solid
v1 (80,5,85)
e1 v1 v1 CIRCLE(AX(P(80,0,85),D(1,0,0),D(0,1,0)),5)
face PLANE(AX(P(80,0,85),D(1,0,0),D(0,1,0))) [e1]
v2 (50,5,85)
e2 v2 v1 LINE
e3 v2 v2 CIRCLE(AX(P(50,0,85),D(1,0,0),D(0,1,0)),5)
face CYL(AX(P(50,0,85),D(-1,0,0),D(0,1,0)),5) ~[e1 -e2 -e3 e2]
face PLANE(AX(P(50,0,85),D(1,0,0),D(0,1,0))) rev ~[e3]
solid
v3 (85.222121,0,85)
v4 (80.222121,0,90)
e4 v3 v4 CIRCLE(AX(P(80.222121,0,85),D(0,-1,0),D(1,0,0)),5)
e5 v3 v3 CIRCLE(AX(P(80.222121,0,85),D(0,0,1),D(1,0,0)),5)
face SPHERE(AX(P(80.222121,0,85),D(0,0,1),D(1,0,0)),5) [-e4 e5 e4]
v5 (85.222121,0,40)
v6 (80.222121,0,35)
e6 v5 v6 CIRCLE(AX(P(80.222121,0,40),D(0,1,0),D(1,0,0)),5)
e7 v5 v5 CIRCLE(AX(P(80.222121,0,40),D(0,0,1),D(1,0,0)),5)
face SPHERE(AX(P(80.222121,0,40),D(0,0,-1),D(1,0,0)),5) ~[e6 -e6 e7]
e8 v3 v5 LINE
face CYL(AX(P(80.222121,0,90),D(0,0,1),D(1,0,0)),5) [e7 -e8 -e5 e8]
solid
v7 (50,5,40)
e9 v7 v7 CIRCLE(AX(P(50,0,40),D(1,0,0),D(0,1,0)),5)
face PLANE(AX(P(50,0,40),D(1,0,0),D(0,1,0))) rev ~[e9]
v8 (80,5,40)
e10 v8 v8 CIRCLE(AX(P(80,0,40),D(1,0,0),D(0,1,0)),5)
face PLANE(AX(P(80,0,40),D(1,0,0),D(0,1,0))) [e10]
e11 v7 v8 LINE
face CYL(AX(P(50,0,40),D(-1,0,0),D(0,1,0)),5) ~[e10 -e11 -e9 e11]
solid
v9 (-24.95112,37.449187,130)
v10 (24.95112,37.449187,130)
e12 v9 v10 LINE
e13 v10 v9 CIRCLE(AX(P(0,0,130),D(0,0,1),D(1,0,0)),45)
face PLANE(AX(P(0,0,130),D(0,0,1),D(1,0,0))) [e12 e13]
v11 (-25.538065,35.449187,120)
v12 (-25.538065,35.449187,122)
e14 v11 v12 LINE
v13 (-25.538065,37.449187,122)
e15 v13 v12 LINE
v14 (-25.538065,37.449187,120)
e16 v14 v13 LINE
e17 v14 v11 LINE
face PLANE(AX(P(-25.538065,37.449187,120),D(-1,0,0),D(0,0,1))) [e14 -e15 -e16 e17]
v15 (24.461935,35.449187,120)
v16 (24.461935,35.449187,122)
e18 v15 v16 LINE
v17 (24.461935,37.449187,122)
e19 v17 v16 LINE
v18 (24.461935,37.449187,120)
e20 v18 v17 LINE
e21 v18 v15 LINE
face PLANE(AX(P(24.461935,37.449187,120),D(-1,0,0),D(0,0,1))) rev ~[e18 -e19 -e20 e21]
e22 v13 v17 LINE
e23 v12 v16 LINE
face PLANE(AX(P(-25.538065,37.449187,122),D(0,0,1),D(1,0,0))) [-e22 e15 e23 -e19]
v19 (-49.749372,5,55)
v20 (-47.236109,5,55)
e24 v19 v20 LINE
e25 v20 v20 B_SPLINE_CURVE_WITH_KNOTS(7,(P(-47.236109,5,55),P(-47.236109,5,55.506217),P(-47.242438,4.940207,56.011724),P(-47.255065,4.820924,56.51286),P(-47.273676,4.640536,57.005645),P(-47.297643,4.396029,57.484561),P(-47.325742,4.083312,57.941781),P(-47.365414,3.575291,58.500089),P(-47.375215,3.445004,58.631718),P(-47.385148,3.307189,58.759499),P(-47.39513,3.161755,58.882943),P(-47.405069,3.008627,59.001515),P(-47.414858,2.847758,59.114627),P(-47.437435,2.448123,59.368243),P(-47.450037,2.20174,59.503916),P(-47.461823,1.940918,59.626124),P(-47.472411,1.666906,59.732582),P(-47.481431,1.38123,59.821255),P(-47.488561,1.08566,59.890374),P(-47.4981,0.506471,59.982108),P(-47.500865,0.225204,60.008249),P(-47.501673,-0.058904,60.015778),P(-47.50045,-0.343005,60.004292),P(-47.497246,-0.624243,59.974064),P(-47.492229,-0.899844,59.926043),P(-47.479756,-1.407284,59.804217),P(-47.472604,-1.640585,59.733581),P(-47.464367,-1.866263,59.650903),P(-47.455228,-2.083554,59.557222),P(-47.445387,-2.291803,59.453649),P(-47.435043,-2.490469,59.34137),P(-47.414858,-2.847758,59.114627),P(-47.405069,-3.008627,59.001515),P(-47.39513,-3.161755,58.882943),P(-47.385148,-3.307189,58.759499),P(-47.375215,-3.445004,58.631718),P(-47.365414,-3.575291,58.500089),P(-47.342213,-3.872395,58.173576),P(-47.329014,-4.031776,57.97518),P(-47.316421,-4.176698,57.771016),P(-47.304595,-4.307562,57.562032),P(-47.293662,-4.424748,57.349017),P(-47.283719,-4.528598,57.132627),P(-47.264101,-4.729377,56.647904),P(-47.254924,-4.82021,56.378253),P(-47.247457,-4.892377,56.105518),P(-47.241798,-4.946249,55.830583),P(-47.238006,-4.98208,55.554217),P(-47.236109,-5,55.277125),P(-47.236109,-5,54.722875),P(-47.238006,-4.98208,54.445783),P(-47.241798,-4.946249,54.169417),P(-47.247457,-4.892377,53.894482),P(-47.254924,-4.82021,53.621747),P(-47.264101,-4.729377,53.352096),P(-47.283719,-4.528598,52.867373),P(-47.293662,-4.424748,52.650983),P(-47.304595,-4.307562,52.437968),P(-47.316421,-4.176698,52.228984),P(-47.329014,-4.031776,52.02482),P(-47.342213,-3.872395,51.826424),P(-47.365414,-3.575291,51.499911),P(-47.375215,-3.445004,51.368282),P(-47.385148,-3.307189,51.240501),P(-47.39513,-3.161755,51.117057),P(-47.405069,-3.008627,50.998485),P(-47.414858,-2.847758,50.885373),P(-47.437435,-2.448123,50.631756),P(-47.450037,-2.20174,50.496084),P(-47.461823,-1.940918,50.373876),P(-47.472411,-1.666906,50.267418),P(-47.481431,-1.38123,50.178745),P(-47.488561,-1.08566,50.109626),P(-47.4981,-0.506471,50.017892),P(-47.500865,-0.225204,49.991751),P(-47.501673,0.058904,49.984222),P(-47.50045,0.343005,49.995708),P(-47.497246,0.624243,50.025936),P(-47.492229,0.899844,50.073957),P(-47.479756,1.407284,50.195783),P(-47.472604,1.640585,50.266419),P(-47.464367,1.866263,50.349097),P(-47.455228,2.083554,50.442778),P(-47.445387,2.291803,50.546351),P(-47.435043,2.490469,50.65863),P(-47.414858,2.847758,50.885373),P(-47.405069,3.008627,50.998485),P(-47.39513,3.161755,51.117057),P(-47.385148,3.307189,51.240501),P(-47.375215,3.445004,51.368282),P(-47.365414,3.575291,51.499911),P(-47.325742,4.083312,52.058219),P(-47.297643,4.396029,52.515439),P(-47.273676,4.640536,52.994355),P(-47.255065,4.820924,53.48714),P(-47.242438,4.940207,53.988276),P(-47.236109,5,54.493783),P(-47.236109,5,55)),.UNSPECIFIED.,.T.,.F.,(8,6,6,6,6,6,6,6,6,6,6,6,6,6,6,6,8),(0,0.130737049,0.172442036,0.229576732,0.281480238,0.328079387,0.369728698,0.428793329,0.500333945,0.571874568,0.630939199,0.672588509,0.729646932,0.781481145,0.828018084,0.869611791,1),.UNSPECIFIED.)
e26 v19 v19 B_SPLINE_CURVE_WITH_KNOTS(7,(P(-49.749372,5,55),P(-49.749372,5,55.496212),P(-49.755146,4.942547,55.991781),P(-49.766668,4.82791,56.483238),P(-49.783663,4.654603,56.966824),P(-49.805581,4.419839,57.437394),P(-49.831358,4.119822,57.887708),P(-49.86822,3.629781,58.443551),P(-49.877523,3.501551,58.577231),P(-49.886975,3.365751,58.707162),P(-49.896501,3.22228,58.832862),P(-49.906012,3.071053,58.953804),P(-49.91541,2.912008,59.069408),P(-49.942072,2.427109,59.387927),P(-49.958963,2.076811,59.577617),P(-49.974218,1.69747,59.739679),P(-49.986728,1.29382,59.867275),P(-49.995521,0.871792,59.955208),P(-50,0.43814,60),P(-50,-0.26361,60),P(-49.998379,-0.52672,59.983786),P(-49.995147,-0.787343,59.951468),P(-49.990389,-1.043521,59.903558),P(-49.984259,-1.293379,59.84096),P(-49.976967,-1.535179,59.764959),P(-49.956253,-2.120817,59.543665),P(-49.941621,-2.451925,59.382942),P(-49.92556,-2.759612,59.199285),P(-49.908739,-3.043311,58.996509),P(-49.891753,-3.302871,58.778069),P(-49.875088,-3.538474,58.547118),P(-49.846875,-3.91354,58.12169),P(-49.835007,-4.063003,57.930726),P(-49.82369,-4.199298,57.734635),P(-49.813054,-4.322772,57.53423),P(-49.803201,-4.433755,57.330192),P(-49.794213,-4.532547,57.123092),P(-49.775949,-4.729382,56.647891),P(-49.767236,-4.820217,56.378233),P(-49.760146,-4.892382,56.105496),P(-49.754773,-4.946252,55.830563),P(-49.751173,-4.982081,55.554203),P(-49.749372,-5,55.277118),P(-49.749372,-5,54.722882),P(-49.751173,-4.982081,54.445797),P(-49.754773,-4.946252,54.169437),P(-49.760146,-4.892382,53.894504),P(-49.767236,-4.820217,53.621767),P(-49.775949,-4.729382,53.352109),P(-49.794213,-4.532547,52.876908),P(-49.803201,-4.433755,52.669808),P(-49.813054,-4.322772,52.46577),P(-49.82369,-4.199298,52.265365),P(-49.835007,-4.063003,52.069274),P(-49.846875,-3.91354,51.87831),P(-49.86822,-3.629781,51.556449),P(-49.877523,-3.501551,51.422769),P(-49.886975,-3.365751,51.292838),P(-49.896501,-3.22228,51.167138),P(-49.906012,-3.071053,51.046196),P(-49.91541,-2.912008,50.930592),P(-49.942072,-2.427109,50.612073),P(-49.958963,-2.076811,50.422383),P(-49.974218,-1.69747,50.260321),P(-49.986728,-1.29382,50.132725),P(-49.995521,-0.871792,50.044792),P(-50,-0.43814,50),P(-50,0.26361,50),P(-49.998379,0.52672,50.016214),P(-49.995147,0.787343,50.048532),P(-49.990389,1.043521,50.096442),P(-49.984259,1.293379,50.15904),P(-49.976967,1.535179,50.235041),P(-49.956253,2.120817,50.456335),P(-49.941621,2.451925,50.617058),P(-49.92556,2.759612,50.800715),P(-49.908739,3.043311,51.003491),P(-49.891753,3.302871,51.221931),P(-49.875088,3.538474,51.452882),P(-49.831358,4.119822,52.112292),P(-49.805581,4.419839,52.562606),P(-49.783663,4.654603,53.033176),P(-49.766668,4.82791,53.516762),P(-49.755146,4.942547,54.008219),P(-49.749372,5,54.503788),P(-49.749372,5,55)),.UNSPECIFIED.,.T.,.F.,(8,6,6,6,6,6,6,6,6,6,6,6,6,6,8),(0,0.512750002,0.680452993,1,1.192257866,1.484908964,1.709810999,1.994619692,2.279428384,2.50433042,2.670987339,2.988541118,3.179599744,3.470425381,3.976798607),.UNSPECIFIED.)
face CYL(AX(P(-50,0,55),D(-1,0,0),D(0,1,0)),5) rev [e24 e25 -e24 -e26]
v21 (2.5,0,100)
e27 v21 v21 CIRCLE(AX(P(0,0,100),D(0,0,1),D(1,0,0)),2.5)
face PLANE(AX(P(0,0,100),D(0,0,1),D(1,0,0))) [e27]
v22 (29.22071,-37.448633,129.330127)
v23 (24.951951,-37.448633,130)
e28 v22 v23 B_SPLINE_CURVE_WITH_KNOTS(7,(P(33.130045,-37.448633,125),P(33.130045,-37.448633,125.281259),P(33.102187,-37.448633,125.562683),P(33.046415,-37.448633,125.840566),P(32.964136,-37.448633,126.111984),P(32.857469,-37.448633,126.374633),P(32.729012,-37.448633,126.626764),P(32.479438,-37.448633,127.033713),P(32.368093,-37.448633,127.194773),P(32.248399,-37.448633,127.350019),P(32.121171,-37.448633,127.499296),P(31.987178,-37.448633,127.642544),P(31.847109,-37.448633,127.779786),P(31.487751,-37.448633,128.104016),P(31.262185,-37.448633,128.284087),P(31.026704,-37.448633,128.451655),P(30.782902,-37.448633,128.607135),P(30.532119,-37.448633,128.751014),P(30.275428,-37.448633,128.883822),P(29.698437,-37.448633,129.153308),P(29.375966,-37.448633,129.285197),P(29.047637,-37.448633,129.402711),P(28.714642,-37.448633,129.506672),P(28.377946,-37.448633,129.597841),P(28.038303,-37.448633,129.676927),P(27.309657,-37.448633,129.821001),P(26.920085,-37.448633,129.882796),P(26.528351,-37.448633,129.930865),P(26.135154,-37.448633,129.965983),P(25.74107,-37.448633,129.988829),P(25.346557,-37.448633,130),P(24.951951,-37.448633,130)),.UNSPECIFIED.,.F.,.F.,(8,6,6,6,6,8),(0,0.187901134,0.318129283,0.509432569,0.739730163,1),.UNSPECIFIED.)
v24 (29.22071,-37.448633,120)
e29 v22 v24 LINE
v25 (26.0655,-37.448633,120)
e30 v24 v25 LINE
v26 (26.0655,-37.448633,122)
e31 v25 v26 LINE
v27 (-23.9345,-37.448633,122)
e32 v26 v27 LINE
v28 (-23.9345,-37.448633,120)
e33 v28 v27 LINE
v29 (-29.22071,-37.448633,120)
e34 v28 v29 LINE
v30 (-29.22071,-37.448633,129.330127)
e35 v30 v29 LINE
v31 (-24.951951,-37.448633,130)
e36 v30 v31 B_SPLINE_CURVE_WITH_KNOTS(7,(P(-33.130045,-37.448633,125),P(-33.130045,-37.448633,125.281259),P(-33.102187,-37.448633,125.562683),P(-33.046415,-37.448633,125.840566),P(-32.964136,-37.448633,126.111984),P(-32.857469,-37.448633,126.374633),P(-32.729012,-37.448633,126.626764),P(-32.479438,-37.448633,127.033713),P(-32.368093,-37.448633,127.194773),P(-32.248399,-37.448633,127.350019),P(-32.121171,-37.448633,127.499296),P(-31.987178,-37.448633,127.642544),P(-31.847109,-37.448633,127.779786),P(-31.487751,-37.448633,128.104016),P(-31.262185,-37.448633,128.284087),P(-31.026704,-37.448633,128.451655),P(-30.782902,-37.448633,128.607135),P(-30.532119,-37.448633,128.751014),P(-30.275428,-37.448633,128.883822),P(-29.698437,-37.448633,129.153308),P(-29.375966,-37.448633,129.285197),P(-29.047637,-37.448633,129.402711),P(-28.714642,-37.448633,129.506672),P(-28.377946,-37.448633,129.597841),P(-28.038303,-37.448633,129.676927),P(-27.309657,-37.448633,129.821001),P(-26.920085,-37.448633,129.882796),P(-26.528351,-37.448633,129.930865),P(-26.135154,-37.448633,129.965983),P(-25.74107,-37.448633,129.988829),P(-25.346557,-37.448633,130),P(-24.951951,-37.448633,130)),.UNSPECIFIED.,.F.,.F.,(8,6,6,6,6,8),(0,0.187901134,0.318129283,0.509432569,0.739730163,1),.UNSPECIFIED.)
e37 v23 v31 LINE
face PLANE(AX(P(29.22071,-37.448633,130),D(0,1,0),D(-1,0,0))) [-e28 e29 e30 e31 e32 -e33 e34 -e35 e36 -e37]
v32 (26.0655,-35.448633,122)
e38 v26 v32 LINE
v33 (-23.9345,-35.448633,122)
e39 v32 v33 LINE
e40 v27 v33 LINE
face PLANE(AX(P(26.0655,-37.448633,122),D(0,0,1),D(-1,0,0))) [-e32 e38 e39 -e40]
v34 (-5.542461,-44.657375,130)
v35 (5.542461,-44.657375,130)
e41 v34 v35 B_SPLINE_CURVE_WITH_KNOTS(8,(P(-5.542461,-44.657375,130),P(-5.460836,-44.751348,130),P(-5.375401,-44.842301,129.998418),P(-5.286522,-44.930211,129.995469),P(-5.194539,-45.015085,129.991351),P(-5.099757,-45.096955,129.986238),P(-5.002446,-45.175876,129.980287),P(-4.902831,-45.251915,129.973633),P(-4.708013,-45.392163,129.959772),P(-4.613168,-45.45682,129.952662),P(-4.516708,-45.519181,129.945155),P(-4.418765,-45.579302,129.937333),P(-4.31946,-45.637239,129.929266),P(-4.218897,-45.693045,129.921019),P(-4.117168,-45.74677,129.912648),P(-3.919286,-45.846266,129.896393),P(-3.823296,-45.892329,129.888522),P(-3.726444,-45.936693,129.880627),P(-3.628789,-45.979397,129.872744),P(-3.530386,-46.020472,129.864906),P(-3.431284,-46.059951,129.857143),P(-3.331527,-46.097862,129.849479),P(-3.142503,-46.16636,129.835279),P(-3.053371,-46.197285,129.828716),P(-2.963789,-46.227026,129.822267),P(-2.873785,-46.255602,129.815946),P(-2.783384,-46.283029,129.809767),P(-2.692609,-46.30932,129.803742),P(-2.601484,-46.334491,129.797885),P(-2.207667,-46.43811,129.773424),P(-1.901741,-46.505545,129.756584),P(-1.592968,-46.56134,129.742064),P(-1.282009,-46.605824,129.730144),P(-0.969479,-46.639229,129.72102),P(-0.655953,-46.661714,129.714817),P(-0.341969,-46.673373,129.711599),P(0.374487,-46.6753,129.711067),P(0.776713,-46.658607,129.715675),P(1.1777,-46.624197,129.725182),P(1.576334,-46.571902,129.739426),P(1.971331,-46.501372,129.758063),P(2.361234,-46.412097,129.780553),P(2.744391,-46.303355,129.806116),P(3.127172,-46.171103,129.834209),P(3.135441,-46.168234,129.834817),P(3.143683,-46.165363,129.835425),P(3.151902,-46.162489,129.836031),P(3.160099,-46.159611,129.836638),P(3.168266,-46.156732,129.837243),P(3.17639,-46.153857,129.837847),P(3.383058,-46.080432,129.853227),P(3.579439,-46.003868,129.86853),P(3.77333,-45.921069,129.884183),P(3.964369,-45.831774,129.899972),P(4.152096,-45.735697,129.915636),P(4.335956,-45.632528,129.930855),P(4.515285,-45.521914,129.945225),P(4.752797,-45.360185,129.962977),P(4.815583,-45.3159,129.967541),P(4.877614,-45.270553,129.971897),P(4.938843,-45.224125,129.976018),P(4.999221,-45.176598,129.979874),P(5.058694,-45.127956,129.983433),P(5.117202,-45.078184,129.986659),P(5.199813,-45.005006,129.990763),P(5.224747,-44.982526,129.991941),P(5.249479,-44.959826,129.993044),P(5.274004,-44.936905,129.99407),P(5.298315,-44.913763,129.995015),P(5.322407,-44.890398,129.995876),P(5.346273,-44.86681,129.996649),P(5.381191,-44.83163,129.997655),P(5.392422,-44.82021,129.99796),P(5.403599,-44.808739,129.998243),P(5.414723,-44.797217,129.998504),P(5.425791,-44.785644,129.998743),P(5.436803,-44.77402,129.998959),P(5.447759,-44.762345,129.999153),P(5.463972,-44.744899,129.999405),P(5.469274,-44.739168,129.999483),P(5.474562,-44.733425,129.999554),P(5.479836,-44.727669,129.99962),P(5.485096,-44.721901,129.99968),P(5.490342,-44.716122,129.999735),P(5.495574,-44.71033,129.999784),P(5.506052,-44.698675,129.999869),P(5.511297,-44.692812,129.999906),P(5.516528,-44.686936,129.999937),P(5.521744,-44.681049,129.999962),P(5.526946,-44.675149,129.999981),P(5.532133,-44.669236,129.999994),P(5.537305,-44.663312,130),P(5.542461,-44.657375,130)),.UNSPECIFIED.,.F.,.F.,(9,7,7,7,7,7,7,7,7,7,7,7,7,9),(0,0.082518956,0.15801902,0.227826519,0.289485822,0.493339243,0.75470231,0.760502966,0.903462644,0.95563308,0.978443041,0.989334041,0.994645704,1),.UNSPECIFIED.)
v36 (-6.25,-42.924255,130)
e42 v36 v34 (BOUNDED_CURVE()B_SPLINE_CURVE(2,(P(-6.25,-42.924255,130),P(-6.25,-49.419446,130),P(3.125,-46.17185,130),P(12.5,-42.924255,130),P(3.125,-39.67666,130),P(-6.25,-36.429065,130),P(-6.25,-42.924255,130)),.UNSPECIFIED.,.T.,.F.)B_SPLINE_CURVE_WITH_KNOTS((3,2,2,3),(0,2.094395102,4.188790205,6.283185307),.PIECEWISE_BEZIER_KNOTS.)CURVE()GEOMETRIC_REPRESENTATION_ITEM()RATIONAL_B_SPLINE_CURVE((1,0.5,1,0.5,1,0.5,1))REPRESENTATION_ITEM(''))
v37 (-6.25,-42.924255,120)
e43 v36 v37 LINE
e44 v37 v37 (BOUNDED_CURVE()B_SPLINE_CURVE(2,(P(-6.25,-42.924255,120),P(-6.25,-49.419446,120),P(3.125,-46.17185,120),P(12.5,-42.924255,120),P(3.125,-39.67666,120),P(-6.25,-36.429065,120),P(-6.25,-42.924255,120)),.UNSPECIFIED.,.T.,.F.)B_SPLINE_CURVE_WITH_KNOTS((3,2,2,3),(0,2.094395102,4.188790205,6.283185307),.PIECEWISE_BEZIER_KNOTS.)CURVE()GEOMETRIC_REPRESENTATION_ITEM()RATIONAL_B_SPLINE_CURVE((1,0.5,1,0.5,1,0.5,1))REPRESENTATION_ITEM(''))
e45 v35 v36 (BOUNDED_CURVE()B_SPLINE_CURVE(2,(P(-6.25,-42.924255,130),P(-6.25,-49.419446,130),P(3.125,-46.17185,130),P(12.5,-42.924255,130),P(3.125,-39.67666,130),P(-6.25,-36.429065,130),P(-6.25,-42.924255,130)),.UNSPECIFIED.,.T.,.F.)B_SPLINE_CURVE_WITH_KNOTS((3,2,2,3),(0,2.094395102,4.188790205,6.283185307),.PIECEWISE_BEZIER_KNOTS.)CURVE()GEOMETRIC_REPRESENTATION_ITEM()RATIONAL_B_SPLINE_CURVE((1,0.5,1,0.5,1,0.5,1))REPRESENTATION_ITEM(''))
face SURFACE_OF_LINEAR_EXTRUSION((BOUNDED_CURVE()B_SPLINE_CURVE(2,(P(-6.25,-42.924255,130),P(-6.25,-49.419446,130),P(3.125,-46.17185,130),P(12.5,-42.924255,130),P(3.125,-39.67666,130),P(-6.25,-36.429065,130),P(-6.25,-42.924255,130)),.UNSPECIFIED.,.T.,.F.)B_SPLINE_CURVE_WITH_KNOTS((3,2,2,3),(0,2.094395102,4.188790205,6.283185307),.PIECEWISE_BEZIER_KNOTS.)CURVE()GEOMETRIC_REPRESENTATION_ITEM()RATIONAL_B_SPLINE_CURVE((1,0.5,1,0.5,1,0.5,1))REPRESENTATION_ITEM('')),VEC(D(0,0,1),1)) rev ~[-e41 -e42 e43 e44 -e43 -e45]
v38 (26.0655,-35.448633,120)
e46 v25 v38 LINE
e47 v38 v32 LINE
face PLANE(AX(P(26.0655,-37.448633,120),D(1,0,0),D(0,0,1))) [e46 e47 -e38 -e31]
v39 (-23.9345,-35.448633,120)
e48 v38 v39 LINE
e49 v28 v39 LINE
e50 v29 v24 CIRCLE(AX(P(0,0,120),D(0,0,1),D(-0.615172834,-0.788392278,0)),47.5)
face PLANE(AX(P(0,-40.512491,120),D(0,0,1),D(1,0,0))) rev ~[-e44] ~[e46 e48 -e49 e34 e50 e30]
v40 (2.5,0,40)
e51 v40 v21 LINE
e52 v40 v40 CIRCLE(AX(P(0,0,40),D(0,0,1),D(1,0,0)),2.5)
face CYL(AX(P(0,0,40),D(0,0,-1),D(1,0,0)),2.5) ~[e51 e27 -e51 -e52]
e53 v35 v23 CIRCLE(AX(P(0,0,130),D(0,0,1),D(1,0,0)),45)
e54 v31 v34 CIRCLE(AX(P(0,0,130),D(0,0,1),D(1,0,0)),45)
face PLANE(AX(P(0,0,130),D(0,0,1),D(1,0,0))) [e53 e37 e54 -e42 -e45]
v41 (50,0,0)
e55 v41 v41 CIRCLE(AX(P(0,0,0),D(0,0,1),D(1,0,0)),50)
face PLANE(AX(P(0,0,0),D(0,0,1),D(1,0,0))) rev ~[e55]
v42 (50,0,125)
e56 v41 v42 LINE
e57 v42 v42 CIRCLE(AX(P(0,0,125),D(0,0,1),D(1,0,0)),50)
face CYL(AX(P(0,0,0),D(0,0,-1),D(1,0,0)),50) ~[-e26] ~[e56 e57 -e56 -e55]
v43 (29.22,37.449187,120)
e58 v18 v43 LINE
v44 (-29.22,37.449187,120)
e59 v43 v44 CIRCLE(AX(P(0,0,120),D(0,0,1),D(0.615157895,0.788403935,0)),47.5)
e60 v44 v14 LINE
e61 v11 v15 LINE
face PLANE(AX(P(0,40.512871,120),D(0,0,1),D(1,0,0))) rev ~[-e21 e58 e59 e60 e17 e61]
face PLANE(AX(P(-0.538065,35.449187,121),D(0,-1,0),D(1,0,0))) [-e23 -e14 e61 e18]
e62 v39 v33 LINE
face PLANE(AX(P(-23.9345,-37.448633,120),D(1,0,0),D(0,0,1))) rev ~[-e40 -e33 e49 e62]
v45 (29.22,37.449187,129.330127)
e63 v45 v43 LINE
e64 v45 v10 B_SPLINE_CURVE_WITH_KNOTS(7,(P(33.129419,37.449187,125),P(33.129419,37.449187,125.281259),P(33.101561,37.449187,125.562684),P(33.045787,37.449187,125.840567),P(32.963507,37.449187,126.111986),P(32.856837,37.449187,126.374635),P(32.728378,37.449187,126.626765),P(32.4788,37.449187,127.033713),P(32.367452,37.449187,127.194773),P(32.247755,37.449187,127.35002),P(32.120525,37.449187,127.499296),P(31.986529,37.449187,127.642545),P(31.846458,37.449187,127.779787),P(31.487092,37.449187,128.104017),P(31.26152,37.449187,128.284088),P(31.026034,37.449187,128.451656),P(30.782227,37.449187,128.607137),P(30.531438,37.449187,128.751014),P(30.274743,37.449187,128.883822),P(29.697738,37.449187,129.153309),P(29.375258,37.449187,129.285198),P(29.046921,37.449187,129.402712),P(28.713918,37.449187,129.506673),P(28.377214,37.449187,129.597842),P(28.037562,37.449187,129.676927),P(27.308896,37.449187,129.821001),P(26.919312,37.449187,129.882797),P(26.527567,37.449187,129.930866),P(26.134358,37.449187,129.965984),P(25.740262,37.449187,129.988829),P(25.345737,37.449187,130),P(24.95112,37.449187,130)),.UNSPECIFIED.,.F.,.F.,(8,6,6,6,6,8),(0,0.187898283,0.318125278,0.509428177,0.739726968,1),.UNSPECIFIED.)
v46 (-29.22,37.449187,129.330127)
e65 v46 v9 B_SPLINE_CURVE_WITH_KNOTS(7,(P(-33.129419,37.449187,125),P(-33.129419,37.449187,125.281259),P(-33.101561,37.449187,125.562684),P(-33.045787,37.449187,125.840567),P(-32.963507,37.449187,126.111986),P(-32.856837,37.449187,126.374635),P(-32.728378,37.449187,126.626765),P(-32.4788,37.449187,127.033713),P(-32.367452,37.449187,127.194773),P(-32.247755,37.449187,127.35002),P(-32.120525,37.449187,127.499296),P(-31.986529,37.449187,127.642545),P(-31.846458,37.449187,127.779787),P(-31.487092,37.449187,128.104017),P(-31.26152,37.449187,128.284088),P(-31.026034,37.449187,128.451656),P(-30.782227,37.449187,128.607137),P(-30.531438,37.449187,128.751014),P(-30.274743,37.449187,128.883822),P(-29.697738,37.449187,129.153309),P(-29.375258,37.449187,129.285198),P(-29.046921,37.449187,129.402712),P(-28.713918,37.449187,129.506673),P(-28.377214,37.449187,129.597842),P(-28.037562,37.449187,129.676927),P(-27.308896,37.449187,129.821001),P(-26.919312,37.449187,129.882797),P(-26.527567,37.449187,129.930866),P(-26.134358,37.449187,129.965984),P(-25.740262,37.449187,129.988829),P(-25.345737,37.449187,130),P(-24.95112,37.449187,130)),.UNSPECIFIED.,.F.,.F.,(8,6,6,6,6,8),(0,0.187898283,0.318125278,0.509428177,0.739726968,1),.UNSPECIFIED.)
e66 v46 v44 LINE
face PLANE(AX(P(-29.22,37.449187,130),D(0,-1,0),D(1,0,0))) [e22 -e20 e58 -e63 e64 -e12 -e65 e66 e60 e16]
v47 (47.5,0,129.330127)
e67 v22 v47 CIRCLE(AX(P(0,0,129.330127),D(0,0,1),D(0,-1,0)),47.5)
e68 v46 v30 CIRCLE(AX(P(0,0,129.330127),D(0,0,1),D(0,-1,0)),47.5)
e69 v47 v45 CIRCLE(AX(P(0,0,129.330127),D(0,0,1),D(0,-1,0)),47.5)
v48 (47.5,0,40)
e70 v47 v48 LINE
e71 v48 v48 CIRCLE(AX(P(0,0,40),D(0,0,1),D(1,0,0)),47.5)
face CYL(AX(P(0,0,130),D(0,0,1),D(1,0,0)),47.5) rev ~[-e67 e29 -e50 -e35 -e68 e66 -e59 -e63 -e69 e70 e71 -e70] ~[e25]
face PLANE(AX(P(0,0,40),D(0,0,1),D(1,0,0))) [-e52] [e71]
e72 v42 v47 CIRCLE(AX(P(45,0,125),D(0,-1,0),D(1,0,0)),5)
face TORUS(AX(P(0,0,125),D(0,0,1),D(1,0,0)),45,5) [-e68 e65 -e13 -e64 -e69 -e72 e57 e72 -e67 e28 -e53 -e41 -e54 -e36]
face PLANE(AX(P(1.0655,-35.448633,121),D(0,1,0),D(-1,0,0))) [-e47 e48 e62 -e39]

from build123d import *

# Parameters (mm, degrees)
F0_R      = 50
F1_DEPTH  = 130
F2_R      = 47.5
F3_DEPTH  = 90
F5_DEPTH  = 10
F7_DEPTH  = 10
F9_DEPTH  = 10
F10_W     = 50
F10_H     = 2
F11_DEPTH = 2
F14_R     = 5
F15_DEPTH = 30
F20_R     = 5
F21_DEPTH = 55
F22_R     = 5
F18_R     = 5
F23_DEPTH = 25
F24_W     = 50
F24_H     = 2
F25_DEPTH = 2
F26_R     = 2.5
F27_DEPTH = 60


# Not quite as in the source:
# - a fillet or chamfer that OpenCascade refuses, or shapes differently, is made with other operations: its cross-section is extruded or revolved along the edge and cut away or added


with BuildPart() as f1:
    # F0 (on Top) → F1 (new body)
    with BuildSketch(Plane.XY):
        Circle(F0_R)
    extrude(amount=F1_DEPTH)

    # F2 (on face) → F3 (cut)
    with BuildSketch(Plane.XY.offset(130)):
        Circle(F2_R)
    extrude(amount=-F3_DEPTH, mode=Mode.SUBTRACT)

    # F4 (on face) → F5 (join)
    with BuildSketch(Plane.XY.offset(130)):
        with BuildLine():
            Line((29.2207095994, -37.4486332262), (-29.2207095994, -37.4486332262))
            ThreePointArc((-29.2207095994, -37.4486332262), (0, -47.5), (29.2207095994, -37.4486332262))
        make_face()
    extrude(amount=-F5_DEPTH)

    # F6 (on face) → F7 (cut)
    with BuildSketch(Plane.XY.offset(130)):
        with BuildLine():
            add(Edge.make_bspline(
                [(-6.25, -42.9242551327), (-6.25, -49.4194456611), (3.125, -46.1718503969), (12.5, -42.9242551327), (3.125, -39.6766598685), (-6.25, -36.4290646043), (-6.25, -42.9242551327)],
                knots=[0, 0, 0, 2.0943951024, 2.0943951024, 4.1887902048, 4.1887902048, 6.2831853072, 6.2831853072, 6.2831853072], degree=2, weights=[1, 0.5, 1, 0.5, 1, 0.5, 1]))
        make_face()
    extrude(amount=-F7_DEPTH, mode=Mode.SUBTRACT)

    # F8 (on face) → F9 (join)
    with BuildSketch(Plane.XY.offset(130)):
        with BuildLine():
            ThreePointArc((29.22, 37.4491869071), (0, 47.5), (-29.22, 37.4491869071))
            Line((-29.22, 37.4491869071), (29.22, 37.4491869071))
        make_face()
    extrude(amount=-F9_DEPTH)

    # F10 (on face) → F11 (join)
    with BuildSketch(Plane.XZ.offset(-37.4491869071)):
        with Locations((-0.5380645394, 121)):
            Rectangle(F10_W, F10_H)
    extrude(amount=F11_DEPTH)

    # F12: fillet of radius 5 on 1 edges, made by hand

    # F12_s1 → F12_t2 (revolve, cut)
    with BuildSketch(Plane.XZ):
        with BuildLine():
            ThreePointArc((50, 125), (48.5355339059, 128.5355339059), (45, 130))
            Line((45, 130), (50, 130))
            Line((50, 130), (50, 125))
        make_face()
    revolve(axis=Axis((0, 0, 130), (0, 0, 1)), mode=Mode.SUBTRACT)

    # F18 (on offset) → F23 (cut)
    with BuildSketch(Plane.YZ.offset(-50)):
        with Locations((0, 55)):
            Circle(F18_R)
    extrude(amount=F23_DEPTH, mode=Mode.SUBTRACT)

    # F24 (on face) → F25 (join)
    with BuildSketch(Plane(origin=(0, -37.4486332262, 0), x_dir=(-1, 0, 0), z_dir=(0, 1, 0))):
        with Locations((-1.0655004531, 121)):
            Rectangle(F24_W, F24_H)
    extrude(amount=F25_DEPTH)

    # F26 (on face) → F27 (join)
    with BuildSketch(Plane.XY.offset(40)):
        Circle(F26_R)
    extrude(amount=F27_DEPTH)


with BuildPart() as f15:
    # F14 (on offset) → F15 (new body)
    with BuildSketch(Plane.YZ.offset(50)):
        with Locations((0, 85)):
            Circle(F14_R)
    extrude(amount=F15_DEPTH)


with BuildPart() as f15b:
    # F14 (on offset) → F15, piece 2 (new body)
    with BuildSketch(Plane.YZ.offset(50)):
        with Locations((0, 40)):
            Circle(F14_R)
    extrude(amount=F15_DEPTH)


with BuildPart() as f21:
    # F20 (on offset) → F21 (new body)
    with BuildSketch(Plane.XY.offset(90)):
        with Locations((80.2221212434, 0)):
            Circle(F20_R)
    extrude(amount=-F21_DEPTH)

    # F22
    f22_edges = [f21.edges().sort_by_distance(p)[0] for p in [
        (75.222121, 0, 35),
        (75.222121, 0, 90),
        (85.222121, 0, 62.5),
    ]]
    fillet(f22_edges, radius=F22_R)


solid = Compound([f1.part, f15.part, f15b.part, f21.part])
